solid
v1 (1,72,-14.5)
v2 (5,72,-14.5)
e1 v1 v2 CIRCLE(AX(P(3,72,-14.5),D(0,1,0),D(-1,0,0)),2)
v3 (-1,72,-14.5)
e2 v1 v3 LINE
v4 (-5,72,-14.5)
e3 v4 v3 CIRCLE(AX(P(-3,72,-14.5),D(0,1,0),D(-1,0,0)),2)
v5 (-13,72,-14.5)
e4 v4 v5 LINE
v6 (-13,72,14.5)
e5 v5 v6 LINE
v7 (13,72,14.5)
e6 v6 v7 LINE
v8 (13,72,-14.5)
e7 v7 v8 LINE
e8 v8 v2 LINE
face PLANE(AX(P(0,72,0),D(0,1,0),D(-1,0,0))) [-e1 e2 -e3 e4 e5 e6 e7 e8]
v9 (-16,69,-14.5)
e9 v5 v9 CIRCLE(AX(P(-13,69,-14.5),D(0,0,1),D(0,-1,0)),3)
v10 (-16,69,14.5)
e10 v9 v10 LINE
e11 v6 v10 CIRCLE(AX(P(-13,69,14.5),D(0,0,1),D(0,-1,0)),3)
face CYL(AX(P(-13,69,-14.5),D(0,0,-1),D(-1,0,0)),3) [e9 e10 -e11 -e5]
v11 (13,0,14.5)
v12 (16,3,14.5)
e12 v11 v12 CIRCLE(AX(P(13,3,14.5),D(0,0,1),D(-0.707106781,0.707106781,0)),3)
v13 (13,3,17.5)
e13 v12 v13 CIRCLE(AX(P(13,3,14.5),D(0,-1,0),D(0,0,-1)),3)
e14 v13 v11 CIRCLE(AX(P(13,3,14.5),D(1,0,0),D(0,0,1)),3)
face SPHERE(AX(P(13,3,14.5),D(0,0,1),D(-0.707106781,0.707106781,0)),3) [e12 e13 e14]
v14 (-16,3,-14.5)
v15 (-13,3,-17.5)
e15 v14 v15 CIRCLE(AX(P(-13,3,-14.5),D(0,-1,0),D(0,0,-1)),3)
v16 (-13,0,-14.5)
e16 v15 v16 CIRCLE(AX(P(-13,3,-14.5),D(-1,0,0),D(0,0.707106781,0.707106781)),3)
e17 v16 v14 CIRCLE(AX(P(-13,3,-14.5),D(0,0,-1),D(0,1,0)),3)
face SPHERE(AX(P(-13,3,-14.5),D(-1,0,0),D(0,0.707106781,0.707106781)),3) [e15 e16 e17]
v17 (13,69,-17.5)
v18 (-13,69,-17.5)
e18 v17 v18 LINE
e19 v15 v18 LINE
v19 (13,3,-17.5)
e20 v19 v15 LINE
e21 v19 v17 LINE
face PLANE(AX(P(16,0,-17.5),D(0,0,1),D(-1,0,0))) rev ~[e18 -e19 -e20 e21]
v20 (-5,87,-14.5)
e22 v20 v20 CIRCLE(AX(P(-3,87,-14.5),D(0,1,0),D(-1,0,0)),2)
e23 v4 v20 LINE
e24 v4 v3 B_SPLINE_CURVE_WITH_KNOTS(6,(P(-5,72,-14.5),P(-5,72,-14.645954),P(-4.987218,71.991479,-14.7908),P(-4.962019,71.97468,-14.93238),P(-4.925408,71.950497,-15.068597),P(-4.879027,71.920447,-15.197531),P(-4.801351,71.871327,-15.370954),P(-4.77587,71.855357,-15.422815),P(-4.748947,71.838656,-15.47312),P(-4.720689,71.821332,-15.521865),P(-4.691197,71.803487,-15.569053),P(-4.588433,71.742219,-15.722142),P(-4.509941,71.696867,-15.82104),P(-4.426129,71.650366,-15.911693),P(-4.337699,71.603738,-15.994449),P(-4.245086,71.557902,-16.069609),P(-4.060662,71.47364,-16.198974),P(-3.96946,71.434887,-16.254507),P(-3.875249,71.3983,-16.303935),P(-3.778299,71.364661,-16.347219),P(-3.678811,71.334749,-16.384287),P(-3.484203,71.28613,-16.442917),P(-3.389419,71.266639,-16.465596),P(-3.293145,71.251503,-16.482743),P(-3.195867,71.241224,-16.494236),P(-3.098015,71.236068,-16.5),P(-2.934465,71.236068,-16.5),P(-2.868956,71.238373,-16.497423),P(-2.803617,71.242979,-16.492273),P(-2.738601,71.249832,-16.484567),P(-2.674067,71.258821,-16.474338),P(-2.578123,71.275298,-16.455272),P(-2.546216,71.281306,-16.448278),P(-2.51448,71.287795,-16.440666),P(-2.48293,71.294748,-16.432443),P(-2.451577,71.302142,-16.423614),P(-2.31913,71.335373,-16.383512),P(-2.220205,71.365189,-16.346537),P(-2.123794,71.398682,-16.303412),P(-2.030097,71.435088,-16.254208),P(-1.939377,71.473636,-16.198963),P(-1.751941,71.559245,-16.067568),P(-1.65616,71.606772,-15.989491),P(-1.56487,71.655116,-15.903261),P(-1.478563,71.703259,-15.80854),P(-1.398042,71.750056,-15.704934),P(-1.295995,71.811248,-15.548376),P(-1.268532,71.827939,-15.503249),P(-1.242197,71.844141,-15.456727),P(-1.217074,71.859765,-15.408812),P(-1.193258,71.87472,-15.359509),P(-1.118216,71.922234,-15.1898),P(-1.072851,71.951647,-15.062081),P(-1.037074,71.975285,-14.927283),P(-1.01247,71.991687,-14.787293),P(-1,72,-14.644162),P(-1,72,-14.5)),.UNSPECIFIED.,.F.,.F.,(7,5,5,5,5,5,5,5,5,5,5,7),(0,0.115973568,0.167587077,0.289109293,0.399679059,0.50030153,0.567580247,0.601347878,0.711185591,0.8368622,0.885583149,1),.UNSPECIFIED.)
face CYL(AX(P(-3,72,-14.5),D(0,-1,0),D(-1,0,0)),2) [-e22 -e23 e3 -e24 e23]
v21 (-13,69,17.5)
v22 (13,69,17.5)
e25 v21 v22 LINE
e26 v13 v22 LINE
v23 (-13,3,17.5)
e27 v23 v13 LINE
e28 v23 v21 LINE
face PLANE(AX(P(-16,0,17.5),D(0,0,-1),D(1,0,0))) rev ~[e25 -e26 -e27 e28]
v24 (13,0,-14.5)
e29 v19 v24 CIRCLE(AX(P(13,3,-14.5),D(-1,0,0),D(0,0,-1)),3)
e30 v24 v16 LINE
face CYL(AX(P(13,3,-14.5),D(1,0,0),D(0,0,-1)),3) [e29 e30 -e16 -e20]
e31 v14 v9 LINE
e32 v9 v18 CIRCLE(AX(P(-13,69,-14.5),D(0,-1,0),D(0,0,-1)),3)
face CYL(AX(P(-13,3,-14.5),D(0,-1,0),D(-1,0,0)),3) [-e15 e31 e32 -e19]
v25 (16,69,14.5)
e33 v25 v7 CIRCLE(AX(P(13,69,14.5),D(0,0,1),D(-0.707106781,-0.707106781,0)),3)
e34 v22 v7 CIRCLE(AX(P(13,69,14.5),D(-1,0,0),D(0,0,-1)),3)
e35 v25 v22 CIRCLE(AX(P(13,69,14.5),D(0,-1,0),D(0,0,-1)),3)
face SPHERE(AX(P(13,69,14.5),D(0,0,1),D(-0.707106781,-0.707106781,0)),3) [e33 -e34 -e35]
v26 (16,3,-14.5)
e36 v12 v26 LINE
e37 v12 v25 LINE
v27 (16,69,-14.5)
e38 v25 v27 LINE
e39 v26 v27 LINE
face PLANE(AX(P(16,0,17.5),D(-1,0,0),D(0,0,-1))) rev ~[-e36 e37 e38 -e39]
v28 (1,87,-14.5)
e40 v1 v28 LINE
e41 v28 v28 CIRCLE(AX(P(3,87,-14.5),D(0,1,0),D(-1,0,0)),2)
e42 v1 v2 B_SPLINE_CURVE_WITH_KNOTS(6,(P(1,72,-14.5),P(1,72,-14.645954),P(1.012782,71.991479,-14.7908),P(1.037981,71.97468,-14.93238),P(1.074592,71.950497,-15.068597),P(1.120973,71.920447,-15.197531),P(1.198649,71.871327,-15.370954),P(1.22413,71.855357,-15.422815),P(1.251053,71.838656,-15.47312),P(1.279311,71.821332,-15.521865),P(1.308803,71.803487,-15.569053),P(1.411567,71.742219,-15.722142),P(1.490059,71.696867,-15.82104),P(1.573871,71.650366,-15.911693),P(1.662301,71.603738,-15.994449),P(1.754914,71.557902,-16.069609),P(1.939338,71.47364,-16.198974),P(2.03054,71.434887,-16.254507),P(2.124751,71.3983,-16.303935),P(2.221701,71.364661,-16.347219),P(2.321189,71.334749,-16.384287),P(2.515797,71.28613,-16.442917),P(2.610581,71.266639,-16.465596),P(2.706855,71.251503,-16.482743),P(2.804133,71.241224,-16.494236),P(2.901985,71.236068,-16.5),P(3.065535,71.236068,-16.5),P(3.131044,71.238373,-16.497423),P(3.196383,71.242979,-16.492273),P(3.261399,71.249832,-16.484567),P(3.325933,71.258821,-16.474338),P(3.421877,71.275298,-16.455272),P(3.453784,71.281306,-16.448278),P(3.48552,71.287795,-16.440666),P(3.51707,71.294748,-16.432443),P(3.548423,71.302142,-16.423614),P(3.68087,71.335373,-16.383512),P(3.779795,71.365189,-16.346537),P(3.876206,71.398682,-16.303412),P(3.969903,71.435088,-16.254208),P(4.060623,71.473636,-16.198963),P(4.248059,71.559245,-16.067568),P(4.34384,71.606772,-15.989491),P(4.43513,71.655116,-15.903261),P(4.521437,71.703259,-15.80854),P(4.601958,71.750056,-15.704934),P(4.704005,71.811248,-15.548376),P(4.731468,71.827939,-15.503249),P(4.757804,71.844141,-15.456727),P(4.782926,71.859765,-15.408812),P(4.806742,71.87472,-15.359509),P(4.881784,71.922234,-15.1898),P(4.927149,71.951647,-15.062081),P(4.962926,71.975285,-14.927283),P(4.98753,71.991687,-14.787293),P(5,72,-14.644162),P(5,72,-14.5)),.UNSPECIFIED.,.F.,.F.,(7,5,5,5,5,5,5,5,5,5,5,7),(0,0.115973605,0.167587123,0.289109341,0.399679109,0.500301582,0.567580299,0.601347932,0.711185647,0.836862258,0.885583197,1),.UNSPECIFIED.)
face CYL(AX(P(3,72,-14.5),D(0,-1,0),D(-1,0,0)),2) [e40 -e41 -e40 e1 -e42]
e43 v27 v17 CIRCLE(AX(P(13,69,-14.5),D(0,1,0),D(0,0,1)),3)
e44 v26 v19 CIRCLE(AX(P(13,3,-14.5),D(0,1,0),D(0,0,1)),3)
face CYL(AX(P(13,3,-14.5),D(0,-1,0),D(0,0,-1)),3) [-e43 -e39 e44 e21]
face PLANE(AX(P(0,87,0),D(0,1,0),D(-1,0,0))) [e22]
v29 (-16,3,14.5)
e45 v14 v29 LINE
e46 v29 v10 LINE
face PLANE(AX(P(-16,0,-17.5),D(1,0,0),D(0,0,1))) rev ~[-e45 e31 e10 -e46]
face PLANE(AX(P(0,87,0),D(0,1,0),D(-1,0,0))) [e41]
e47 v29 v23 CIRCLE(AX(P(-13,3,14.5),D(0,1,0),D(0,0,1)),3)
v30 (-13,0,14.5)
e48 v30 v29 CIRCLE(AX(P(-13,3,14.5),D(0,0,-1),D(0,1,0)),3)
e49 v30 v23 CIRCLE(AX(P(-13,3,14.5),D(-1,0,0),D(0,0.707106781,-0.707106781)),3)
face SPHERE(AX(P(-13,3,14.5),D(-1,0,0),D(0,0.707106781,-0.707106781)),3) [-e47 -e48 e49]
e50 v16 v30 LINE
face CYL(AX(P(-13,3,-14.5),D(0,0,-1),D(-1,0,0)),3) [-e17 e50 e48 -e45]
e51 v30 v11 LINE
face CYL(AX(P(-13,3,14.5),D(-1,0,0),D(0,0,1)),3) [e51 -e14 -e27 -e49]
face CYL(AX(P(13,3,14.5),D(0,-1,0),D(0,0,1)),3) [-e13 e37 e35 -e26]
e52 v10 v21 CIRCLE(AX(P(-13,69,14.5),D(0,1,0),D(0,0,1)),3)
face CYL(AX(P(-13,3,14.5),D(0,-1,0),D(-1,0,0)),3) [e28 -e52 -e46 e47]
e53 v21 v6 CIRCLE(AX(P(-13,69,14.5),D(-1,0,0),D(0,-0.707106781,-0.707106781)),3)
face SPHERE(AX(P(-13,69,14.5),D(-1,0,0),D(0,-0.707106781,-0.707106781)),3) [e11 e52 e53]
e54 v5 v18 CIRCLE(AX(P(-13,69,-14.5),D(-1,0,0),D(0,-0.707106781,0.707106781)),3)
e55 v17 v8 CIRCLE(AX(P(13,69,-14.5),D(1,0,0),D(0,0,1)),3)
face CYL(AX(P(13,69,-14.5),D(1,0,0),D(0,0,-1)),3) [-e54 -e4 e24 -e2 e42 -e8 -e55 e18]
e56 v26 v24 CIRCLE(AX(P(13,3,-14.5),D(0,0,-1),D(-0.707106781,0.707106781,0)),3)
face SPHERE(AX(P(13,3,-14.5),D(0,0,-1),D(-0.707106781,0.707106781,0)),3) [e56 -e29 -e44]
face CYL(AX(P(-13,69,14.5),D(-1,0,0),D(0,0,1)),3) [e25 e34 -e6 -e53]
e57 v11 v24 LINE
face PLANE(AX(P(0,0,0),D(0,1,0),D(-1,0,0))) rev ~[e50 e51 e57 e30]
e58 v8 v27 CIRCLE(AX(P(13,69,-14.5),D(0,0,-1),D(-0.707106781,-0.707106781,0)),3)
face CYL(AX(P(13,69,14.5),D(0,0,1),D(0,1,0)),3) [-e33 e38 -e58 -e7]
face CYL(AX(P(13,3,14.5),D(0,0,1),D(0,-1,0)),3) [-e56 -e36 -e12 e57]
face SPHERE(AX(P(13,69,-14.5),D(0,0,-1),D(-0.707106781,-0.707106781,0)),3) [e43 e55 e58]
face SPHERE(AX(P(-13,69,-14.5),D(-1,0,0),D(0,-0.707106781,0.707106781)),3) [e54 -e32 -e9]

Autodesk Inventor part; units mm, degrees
ref_plane "YZ Plane" through (0, 0, 0) normal (1, 0, 0) x (0, 1, 0)
ref_plane "XZ Plane" through (0, 0, 0) normal (0, 1, 0) x (-1, 0, 0)
ref_plane "XY Plane" through (0, 0, 0) normal (0, 0, 1) x (1, 0, 0)
sketch "Sketch1" plane through (0, 0, 0) normal (0, 1, 0) x (-1, 0, 0)
  line L0 (16, 17.5) -> (-16, 17.5)
  line L1 (-16, 17.5) -> (-16, -17.5)
  line L2 (-16, -17.5) -> (16, -17.5)
  line L3 (16, -17.5) -> (16, 17.5)
  line L4 (16, 17.5) -> (-16, -17.5) construction
  line L5 (-16, 17.5) -> (16, -17.5) construction
  line L6 (0, -17.5) -> (0, -14.5) construction
  line L7 (0, -14.5) -> (3, -14.5) construction
  circle A0 centre (3, -14.5) radius 2
  circle A1 centre (-3, -14.5) radius 2
  point P0 (0, 0)
  dimension "d0" = 32
  dimension "d1" = 35
  dimension "d5" = 3
  dimension "d6" = 3
  dimension "d7" = 4
extrude "Extrusion1" add sketch "Sketch1" along normal blind 72 contours L3 L2 L1 L0 | A0 | A1
extrude "Extrusion2" add sketch "Sketch1" along normal blind 15 from surface at 72 contours A0 | A1
fillet "Fillet1" radius 3 12 edges at (16, 36, 17.5) (16, 36, -17.5) (-16, 36, 17.5) (-16, 36, -17.5) (16, 72, 0) (0, 72, 17.5) (0, 72, -17.5) (-16, 72, 0) (16, 0, 0) (0, 0, 17.5) (-16, 0, 0) (0, 0, -17.5)
properties part number "SLS Quantum 1300mAh 4S1P 14,8V 65C"
